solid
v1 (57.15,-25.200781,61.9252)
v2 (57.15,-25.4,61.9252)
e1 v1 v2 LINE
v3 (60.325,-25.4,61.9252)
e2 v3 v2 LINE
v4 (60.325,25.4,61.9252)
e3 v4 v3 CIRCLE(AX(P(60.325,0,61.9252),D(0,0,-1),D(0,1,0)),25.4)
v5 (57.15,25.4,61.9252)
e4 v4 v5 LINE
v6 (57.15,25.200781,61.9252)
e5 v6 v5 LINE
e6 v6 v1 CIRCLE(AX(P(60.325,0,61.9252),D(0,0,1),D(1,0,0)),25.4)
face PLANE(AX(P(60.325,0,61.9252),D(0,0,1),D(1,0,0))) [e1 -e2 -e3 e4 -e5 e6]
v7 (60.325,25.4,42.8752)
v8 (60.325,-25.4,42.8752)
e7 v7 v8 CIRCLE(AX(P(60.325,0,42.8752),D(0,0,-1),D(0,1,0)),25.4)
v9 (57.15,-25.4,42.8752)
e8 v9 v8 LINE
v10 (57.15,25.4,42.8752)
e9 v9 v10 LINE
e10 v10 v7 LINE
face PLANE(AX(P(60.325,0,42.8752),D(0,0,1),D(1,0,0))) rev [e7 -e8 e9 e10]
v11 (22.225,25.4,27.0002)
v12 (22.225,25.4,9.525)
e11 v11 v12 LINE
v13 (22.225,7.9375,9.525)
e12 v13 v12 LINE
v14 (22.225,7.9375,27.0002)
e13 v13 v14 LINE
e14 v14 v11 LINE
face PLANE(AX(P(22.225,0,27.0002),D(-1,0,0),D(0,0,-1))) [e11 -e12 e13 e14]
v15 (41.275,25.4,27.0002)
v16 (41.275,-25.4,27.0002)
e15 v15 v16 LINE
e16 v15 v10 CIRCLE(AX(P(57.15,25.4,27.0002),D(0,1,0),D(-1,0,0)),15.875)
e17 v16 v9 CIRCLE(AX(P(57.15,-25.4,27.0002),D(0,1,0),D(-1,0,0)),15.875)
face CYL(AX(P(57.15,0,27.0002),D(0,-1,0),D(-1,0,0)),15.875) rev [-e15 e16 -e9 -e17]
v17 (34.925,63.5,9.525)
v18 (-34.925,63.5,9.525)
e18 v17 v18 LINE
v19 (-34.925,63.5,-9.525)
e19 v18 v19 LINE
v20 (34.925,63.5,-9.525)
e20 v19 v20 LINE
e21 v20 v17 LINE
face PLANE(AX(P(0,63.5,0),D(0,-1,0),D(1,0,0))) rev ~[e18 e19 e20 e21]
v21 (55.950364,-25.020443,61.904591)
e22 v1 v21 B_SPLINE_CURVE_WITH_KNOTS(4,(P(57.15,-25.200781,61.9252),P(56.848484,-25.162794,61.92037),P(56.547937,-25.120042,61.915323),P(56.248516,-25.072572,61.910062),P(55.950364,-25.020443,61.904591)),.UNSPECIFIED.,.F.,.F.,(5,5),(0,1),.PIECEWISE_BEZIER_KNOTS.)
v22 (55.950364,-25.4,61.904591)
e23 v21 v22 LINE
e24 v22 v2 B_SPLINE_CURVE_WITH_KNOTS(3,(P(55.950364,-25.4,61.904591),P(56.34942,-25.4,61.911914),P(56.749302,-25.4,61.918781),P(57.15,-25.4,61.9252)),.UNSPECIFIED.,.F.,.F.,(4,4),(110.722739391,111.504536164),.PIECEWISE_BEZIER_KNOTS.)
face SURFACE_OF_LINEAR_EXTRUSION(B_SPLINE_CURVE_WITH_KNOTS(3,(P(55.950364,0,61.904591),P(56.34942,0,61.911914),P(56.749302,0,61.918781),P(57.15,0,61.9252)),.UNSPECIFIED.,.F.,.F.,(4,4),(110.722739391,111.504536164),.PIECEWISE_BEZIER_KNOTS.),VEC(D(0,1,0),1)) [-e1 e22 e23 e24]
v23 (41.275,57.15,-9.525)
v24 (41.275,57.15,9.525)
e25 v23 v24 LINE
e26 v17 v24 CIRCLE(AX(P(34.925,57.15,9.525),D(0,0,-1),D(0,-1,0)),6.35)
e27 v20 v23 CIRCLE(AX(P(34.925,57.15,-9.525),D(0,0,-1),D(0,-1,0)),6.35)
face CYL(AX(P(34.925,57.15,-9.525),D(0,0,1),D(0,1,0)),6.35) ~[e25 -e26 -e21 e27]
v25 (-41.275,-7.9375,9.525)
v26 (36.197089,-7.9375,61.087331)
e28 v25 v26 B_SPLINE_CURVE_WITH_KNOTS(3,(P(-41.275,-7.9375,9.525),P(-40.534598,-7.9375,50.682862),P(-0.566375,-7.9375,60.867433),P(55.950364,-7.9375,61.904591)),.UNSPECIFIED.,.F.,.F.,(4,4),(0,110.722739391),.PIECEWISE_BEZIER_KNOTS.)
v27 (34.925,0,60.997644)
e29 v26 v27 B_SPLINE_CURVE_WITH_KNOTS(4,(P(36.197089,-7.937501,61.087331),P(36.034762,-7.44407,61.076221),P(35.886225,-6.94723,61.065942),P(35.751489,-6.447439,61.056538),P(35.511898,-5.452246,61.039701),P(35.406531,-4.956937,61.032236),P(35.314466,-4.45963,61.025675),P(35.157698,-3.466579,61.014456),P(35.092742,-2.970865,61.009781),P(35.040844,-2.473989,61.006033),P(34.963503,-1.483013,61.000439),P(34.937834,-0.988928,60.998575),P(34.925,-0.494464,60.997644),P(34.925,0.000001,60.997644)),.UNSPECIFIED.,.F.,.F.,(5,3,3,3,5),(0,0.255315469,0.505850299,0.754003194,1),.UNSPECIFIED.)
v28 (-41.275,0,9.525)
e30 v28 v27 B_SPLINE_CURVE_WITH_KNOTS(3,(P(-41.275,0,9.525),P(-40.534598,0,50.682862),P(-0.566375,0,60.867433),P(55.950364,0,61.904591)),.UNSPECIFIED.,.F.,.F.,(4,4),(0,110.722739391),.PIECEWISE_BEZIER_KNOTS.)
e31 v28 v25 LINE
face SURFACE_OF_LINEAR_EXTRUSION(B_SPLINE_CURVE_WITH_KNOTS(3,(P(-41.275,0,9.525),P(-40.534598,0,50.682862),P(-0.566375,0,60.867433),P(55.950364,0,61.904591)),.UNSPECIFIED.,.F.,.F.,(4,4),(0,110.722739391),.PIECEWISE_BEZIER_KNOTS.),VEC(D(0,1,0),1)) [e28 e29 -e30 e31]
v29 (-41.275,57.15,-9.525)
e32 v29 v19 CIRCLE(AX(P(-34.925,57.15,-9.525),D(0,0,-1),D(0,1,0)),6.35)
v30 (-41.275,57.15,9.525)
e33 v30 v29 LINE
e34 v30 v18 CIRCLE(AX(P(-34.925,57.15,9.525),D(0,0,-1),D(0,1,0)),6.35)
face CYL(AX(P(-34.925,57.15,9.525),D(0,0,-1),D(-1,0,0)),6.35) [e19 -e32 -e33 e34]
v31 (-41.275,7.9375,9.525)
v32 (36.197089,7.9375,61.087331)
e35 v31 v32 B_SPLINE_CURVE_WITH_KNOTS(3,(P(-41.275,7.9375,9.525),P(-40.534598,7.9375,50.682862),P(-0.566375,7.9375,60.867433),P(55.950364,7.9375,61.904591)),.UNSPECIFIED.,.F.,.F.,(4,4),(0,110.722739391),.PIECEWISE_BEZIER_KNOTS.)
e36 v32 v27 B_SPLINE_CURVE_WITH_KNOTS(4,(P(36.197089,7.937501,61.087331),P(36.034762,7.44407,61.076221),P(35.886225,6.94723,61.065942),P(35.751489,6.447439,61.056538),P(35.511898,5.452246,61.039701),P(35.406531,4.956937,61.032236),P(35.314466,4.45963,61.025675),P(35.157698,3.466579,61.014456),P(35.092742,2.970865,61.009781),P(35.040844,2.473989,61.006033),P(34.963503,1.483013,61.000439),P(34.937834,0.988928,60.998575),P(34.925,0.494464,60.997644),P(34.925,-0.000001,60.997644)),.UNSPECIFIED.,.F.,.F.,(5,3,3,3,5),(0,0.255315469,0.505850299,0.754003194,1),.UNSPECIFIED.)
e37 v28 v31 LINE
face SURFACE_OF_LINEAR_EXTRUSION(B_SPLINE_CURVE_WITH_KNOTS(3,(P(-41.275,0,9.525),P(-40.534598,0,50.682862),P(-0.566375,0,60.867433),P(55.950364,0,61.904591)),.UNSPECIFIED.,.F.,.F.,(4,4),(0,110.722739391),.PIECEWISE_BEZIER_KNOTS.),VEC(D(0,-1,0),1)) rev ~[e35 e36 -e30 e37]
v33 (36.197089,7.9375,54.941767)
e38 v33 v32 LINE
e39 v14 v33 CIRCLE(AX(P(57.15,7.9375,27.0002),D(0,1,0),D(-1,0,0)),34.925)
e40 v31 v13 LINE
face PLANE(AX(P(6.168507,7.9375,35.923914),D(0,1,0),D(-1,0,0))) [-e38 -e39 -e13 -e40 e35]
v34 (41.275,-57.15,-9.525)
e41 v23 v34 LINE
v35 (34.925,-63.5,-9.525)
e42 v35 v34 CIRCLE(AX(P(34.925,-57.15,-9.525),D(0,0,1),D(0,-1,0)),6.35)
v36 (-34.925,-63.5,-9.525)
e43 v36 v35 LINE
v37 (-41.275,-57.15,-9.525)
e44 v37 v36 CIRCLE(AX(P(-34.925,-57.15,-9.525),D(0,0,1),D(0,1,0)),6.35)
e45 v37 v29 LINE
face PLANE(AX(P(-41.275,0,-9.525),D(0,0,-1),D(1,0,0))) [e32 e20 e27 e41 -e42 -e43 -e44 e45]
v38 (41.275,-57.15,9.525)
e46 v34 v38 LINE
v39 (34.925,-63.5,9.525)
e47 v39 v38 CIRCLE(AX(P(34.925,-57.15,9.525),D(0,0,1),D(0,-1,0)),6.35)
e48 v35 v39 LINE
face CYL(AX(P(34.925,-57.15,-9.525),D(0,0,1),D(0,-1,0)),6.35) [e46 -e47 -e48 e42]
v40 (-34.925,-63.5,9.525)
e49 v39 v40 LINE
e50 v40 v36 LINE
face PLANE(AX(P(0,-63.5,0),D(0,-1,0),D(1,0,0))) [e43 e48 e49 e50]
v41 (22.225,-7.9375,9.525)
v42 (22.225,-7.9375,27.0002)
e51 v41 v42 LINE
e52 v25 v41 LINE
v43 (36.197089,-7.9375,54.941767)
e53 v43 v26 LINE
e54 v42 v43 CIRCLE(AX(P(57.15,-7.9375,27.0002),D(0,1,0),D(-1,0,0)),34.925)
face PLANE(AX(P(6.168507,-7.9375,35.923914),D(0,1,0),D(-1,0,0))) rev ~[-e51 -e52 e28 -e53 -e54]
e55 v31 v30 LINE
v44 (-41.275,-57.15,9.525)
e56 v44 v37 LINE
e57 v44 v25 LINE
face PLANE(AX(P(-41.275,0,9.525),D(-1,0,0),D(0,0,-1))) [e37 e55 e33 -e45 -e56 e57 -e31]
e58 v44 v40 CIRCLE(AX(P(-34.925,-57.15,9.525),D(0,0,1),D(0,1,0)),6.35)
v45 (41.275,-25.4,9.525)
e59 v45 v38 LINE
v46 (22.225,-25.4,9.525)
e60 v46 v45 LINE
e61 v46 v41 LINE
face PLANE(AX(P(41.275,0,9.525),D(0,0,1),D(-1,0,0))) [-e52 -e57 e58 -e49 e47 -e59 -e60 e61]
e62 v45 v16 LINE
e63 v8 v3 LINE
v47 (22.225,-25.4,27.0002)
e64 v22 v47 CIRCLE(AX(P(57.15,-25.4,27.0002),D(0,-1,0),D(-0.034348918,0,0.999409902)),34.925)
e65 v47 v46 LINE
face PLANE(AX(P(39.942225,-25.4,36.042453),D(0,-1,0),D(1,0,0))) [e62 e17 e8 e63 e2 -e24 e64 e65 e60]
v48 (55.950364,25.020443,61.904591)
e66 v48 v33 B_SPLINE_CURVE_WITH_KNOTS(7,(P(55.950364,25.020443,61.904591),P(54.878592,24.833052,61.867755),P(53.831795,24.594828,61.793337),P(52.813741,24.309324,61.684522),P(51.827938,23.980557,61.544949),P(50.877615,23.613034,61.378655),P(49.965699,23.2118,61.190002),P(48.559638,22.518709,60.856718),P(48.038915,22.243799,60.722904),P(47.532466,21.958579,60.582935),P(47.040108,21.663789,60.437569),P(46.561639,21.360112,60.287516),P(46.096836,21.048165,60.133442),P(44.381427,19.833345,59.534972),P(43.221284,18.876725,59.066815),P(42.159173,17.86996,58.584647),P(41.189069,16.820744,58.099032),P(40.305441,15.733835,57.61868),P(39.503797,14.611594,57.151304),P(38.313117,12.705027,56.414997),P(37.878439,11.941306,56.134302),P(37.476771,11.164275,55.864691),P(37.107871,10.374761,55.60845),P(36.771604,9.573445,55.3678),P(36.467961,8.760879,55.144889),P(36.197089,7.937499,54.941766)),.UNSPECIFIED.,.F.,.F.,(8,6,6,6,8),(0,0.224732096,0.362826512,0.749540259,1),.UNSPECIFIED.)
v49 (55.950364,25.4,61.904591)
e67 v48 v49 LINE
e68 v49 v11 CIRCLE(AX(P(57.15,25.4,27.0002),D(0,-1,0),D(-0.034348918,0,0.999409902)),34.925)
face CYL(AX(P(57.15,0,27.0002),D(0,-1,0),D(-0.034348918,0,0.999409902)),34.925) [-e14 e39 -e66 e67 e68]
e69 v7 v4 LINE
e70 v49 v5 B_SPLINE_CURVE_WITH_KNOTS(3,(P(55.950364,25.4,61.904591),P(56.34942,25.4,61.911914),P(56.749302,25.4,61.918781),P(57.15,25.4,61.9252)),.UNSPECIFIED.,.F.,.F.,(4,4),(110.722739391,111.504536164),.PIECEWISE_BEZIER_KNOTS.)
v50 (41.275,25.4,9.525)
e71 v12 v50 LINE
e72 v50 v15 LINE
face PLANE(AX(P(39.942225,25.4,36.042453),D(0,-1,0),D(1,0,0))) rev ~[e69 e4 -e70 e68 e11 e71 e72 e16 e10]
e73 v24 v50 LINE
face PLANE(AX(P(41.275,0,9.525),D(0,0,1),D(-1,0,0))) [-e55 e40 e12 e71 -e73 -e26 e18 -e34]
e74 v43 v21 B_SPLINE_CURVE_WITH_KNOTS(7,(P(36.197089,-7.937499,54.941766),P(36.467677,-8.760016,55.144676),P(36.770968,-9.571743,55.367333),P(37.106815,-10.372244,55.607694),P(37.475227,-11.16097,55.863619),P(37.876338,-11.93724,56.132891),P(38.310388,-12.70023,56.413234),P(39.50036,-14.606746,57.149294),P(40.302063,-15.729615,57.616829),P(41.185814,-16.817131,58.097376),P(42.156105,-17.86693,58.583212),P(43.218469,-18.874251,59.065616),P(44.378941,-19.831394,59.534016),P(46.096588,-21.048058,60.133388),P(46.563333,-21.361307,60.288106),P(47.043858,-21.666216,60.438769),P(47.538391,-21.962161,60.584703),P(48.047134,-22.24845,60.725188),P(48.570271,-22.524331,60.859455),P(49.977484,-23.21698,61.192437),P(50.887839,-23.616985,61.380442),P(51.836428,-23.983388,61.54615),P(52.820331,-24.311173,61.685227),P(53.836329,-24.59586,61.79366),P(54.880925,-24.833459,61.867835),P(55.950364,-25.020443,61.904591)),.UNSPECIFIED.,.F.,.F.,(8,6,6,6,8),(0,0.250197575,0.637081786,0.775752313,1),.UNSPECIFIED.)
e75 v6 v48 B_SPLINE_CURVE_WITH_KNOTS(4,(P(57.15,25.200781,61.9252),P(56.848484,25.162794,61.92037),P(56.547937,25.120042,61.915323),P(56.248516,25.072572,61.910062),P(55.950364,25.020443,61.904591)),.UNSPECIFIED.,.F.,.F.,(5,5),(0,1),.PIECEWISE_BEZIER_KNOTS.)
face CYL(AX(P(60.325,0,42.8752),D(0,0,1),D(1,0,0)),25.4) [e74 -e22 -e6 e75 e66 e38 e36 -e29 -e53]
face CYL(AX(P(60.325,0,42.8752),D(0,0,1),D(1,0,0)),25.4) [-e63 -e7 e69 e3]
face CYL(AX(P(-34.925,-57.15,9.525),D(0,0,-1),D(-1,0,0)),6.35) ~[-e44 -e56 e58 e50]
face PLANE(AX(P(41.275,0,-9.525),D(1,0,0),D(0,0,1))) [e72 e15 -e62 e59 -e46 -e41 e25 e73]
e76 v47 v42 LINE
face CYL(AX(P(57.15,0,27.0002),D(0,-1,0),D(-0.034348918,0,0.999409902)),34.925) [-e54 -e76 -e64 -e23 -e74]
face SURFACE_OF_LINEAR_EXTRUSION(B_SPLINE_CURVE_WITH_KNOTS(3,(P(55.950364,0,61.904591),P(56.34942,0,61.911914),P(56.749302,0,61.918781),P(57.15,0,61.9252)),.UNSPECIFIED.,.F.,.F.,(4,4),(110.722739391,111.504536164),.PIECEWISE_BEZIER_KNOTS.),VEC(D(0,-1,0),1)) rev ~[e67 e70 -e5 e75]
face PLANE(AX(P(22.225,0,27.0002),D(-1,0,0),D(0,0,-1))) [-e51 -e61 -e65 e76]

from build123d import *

# Parameters (mm, degrees)
F1_DEPTH = 63.5
F2_DEPTH = 25.4
F3_DEPTH = 7.9375
F5_R     = 6.35


with BuildPart() as f1:
    # F0 (on Front) → F1 (new body, symmetric)
    with BuildSketch(Plane.XZ):
        Polygon((-41.275, -9.525), (41.275, -9.525), (41.275, 9.525), (22.225, 9.525), (-41.275, 9.525), align=None)
    extrude(amount=F1_DEPTH, both=True)

    # F0 (on Front) → F2 (join, symmetric)
    with BuildSketch(Plane.XZ):
        with BuildLine():
            Line((22.225, 9.525), (41.275, 9.525))
            Line((41.275, 9.525), (41.275, 27.0002))
            ThreePointArc((41.275, 27.0002), (45.9246798487, 38.2255201513), (57.15, 42.8752))
            Line((57.15, 42.8752), (60.325, 42.8752))
            Line((60.325, 42.8752), (60.325, 61.9252))
            Line((60.325, 61.9252), (57.15, 61.9252))
            add(Edge.make_bspline(
                [(55.950364042, 61.9045908208), (56.3494203194, 61.9119140361), (56.7493016333, 61.9187812014), (57.15, 61.9252)],
                knots=[110.7227393915, 110.7227393915, 110.7227393915, 110.7227393915, 111.5045361635, 111.5045361635, 111.5045361635, 111.5045361635], degree=3))
            ThreePointArc((55.950364042, 61.9045908208), (32.0337412138, 51.2680628969), (22.225, 27.0002))
            Line((22.225, 27.0002), (22.225, 9.525))
        make_face()
    extrude(amount=F2_DEPTH, both=True)

    # F0 (on Front) → F3 (join, symmetric)
    with BuildSketch(Plane.XZ):
        with BuildLine():
            add(Edge.make_bspline(
                [(-41.275, 9.525), (-40.5345981749, 50.6828617224), (-0.5663750684, 60.8674332248), (55.950364042, 61.9045908208)],
                knots=[0, 0, 0, 0, 110.7227393915, 110.7227393915, 110.7227393915, 110.7227393915], degree=3))
            Line((-41.275, 9.525), (22.225, 9.525))
            Line((22.225, 9.525), (22.225, 27.0002))
            ThreePointArc((22.225, 27.0002), (32.0337412138, 51.2680628969), (55.950364042, 61.9045908208))
        make_face()
    extrude(amount=F3_DEPTH, both=True)

    # F0 (on Front) → F4 (revolve)
    with BuildSketch(Plane.XZ):
        Polygon((60.325, 61.9252), (60.325, 42.8752), (85.725, 42.8752), (85.725, 47.9196608067), (85.725, 61.9252), align=None)
    revolve(axis=Axis((60.325, 0, 52.3875), (0, 0, 1)))

    # F5
    f5_edges = [f1.edges().sort_by_distance(p)[0] for p in [
        (41.275, -63.5, 0),
        (-41.275, -63.5, 0),
        (41.275, 63.5, 0),
        (-41.275, 63.5, 0),
    ]]
    fillet(f5_edges, radius=F5_R)


solid = f1.part
